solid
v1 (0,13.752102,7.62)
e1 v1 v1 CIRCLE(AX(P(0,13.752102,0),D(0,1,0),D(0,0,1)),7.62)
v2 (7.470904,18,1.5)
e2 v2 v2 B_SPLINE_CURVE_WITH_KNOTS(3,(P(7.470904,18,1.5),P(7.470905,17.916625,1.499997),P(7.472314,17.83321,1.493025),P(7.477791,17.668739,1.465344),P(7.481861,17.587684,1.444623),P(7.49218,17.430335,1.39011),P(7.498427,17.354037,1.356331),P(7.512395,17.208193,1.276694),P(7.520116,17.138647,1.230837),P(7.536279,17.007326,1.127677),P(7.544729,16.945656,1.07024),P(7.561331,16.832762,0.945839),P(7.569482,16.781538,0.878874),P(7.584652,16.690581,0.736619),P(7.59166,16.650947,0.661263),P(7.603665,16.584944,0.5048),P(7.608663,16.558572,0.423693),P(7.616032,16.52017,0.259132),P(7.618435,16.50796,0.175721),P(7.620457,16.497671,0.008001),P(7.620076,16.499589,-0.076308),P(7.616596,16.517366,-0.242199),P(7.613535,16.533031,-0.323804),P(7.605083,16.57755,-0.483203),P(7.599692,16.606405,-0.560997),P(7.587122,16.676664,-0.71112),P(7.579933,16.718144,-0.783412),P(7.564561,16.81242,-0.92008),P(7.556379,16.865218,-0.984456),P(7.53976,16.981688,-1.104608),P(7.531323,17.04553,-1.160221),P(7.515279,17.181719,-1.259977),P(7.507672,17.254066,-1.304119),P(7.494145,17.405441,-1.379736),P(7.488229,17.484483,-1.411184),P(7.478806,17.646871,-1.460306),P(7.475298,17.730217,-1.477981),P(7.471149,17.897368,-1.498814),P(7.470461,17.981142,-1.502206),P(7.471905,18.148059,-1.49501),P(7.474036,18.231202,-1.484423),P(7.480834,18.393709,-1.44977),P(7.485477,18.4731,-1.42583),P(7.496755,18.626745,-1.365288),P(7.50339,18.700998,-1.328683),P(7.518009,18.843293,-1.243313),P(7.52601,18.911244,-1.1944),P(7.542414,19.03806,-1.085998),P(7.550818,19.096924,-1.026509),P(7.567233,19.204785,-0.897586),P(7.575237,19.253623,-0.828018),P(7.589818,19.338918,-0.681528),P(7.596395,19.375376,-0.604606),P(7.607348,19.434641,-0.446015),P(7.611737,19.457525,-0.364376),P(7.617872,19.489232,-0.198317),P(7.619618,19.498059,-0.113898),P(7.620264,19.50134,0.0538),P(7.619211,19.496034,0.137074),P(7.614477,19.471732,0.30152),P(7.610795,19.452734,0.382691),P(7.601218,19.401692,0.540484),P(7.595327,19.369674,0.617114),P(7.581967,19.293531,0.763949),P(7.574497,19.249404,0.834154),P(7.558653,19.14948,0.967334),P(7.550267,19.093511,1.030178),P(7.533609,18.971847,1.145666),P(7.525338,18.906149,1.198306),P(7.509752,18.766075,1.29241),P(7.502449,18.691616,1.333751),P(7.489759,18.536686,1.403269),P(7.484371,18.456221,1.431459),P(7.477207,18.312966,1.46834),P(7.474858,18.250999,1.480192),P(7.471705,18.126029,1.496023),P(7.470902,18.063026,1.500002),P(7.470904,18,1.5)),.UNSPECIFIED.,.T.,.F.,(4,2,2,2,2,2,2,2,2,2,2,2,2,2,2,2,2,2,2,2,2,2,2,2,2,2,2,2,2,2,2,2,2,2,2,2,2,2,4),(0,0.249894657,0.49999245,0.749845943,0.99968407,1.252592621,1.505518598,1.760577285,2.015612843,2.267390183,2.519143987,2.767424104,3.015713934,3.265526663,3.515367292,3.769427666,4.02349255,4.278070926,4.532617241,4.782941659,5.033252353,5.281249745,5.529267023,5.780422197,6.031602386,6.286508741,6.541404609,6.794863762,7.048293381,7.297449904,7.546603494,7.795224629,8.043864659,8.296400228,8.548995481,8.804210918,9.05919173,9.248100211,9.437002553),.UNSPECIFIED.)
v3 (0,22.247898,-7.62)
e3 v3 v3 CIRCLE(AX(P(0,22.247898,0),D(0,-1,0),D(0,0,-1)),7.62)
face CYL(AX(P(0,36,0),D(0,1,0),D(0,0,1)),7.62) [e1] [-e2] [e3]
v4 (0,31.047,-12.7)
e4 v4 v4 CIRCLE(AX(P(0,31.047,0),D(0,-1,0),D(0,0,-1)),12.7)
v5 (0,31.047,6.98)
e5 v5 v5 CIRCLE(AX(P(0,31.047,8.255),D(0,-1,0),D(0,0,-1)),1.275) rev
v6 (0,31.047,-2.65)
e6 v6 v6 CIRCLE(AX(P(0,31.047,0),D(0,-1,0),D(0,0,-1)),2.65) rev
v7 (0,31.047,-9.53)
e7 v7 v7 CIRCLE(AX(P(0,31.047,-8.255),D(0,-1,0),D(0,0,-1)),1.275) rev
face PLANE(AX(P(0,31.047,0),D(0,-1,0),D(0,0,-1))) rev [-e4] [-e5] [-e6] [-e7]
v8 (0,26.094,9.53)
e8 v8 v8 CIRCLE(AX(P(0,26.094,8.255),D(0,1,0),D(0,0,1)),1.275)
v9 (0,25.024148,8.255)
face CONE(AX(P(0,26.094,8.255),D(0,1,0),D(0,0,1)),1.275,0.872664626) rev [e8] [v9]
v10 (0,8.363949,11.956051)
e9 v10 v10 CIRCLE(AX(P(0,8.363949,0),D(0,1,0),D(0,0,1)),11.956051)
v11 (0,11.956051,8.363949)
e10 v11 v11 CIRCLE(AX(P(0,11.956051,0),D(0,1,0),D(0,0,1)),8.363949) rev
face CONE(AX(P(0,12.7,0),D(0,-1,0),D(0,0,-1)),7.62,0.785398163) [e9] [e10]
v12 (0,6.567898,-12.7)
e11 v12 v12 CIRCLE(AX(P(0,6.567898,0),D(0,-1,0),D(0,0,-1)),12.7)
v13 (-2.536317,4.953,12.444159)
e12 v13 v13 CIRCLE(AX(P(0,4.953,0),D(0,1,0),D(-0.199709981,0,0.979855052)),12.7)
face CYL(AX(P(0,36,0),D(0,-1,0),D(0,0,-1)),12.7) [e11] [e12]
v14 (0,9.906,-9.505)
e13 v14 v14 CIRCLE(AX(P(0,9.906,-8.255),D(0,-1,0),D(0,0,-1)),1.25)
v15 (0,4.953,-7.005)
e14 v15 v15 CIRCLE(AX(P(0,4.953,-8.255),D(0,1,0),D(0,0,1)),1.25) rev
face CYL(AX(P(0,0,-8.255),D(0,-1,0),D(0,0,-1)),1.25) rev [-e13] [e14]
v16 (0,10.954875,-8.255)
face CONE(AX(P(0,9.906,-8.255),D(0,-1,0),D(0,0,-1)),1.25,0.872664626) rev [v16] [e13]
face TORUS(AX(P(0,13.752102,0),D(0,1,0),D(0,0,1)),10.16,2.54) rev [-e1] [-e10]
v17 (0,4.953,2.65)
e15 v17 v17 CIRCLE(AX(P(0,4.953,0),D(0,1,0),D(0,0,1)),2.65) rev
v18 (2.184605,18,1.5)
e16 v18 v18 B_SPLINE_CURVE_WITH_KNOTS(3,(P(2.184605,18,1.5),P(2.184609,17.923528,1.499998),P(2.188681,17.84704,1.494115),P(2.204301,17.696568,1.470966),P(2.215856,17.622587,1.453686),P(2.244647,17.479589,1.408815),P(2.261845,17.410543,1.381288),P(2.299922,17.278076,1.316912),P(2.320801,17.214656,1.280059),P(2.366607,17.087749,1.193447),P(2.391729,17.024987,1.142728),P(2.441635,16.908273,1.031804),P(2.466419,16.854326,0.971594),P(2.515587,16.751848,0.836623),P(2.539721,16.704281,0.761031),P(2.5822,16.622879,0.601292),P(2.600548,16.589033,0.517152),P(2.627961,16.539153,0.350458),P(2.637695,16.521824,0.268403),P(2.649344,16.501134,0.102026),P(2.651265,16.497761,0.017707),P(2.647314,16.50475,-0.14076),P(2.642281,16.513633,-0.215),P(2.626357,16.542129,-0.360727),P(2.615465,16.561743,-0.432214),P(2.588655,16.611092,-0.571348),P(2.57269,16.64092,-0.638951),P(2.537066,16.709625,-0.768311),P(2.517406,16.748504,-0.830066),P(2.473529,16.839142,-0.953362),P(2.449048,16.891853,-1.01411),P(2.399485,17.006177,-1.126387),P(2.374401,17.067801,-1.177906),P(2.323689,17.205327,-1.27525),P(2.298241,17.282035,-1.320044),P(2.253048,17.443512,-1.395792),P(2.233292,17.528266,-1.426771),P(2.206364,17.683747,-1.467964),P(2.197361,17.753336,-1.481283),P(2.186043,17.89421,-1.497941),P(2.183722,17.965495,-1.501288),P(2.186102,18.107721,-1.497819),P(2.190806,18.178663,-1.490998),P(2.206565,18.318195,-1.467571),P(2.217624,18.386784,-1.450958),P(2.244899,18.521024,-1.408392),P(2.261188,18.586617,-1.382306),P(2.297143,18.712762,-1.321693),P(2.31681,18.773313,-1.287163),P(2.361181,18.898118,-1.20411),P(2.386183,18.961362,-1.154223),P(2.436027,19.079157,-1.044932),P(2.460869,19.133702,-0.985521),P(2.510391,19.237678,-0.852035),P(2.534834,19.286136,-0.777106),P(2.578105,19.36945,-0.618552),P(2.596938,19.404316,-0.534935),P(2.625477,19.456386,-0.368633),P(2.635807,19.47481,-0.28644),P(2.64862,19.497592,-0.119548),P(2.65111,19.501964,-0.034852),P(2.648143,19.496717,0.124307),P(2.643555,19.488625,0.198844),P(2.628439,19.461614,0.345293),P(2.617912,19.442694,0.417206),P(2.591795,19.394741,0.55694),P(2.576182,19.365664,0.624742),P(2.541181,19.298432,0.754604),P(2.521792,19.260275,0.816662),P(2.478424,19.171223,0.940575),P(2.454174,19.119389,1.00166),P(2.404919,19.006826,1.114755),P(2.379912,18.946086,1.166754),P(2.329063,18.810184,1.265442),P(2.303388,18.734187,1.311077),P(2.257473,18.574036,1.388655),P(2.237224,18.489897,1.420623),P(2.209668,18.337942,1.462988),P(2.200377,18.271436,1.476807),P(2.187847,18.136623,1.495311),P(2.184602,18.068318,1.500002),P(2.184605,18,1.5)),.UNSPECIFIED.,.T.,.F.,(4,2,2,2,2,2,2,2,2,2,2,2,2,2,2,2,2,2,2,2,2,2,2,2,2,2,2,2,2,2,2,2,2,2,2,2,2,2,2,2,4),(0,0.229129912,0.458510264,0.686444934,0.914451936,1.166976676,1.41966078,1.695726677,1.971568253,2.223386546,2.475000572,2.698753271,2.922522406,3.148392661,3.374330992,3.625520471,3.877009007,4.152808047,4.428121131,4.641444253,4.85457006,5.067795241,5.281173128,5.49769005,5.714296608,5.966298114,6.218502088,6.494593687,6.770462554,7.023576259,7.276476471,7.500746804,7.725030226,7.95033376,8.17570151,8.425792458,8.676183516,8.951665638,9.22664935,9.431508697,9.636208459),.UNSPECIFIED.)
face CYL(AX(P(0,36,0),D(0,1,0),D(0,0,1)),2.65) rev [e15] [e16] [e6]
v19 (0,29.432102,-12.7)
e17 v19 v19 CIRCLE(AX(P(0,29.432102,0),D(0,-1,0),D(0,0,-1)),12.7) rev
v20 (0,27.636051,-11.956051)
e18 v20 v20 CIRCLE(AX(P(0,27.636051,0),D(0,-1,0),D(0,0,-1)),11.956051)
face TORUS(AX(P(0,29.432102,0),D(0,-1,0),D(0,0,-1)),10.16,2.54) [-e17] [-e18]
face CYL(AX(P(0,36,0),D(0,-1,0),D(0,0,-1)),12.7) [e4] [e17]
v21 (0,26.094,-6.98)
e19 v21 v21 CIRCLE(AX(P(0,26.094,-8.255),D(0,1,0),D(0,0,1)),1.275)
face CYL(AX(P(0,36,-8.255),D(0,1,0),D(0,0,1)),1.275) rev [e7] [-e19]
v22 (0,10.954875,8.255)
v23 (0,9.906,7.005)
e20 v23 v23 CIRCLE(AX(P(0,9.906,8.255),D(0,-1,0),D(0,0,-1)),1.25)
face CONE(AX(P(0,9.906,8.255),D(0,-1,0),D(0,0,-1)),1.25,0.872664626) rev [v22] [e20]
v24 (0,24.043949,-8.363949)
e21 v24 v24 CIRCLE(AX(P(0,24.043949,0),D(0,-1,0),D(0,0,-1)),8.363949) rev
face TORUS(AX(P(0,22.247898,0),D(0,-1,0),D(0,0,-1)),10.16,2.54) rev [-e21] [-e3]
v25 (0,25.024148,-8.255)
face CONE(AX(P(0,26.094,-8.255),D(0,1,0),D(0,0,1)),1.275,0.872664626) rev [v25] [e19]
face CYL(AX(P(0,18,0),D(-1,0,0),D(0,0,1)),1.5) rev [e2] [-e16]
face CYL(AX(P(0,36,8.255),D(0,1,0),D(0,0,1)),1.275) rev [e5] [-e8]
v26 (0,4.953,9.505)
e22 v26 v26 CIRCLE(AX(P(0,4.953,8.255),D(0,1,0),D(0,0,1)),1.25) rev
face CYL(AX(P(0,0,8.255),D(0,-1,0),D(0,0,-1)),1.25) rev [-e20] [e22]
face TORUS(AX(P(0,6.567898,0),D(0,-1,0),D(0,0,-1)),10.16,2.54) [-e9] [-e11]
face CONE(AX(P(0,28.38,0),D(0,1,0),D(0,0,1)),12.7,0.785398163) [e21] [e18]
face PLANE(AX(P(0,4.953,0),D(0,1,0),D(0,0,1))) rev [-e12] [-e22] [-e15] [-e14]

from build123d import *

# Parameters (mm, degrees)
SKETCH1_R                 = 12.7
BOSS_EXTRUDE1_DEPTH       = 36
F_5_0MM_DOWEL_HOLE1_D     = 5.3
BOSS_EXTRUDE2_START       = -4.953
BOSS_EXTRUDE2_DEPTH       = 2.286
CIRPATTERN3_COUNT         = 33
CIRPATTERN3_ANGLE         = 348.48
CIRPATTERN3_START         = -4.953
CIRPATTERN3_COPY_1_DEPTH  = 2.286
CIRPATTERN3_COPY_2_DEPTH  = 2.286
CIRPATTERN3_COPY_3_DEPTH  = 2.286
CIRPATTERN3_COPY_4_DEPTH  = 2.286
CIRPATTERN3_COPY_5_DEPTH  = 2.286
CIRPATTERN3_COPY_6_DEPTH  = 2.286
CIRPATTERN3_COPY_7_DEPTH  = 2.286
CIRPATTERN3_COPY_8_DEPTH  = 2.286
CIRPATTERN3_COPY_9_DEPTH  = 2.286
CIRPATTERN3_COPY_10_DEPTH = 2.286
CIRPATTERN3_COPY_11_DEPTH = 2.286
CIRPATTERN3_COPY_12_DEPTH = 2.286
CIRPATTERN3_COPY_13_DEPTH = 2.286
CIRPATTERN3_COPY_14_DEPTH = 2.286
CIRPATTERN3_COPY_15_DEPTH = 2.286
CIRPATTERN3_COPY_16_DEPTH = 2.286
CIRPATTERN3_COPY_17_DEPTH = 2.286
CIRPATTERN3_COPY_18_DEPTH = 2.286
CIRPATTERN3_COPY_19_DEPTH = 2.286
CIRPATTERN3_COPY_20_DEPTH = 2.286
CIRPATTERN3_COPY_21_DEPTH = 2.286
CIRPATTERN3_COPY_22_DEPTH = 2.286
CIRPATTERN3_COPY_23_DEPTH = 2.286
CIRPATTERN3_COPY_24_DEPTH = 2.286
CIRPATTERN3_COPY_25_DEPTH = 2.286
CIRPATTERN3_COPY_26_DEPTH = 2.286
CIRPATTERN3_COPY_27_DEPTH = 2.286
CIRPATTERN3_COPY_28_DEPTH = 2.286
CIRPATTERN3_COPY_29_DEPTH = 2.286
CIRPATTERN3_COPY_30_DEPTH = 2.286
CIRPATTERN3_COPY_31_DEPTH = 2.286
CIRPATTERN3_COPY_32_DEPTH = 2.286
SKETCH7_W                 = 5.08
SKETCH7_H                 = 20.76
CHAMFER1_SIZE             = 5.08
SKETCH10_W                = 1.5
SKETCH10_H                = 14.726283714
FILLET2_R                 = 1.27
M3X0_5_TAPPED_HOLE2_D     = 2.55
M3X0_5_TAPPED_HOLE2_DEPTH = 9.906
M3X0_5_TAPPED_HOLE2_TIP   = 1.06985203
M3X0_5_TAPPED_HOLE1_D     = 2.5
M3X0_5_TAPPED_HOLE1_DEPTH = 9.906
M3X0_5_TAPPED_HOLE1_TIP   = 1.048874539
INTERSECT1_OUTLINE_R      = 2.65
INTERSECT1_OUTLINE_R_2    = 1.25
INTERSECT1_DEPTH          = 4.953
INTERSECT1_START          = 31.047
INTERSECT1_2_OUTLINE_R    = 1.275
INTERSECT1_2_OUTLINE_R_2  = 2.65
INTERSECT1_2_DEPTH        = 4.953


with BuildPart() as part:
    # Sketch1 → Boss-Extrude1 (new body)
    with BuildSketch(Plane(origin=(0, 0, 0), x_dir=(1, 0, 0), z_dir=(0, 1, 0))):
        with Locations(Location((0, 0, 0), (0, 0, 270))):
            Circle(SKETCH1_R)
    extrude(amount=BOSS_EXTRUDE1_DEPTH)

    # Ø5.0mm Dowel Hole1 (through all)
    with Locations(Plane(origin=(0, 36, 0), x_dir=(1, 0, 0), z_dir=(0, 1, 0))):
        with Locations((0, 0)):
            Hole(F_5_0MM_DOWEL_HOLE1_D / 2)

    # Sketch4 → Boss-Extrude2 (add)
    with BuildSketch(Plane(origin=(0, 36, 0), x_dir=(1, 0, 0), z_dir=(0, 1, 0)).offset(BOSS_EXTRUDE2_START)):
        with BuildLine():
            Line((14.726283714, 0.381), (12.694283714, 0.381))
            ThreePointArc((12.694283714, 0.381), (12.698570848, 0.19052144), (12.7, 0))
            ThreePointArc((12.7, 0), (12.698570848, -0.19052144), (12.694283714, -0.381))
            Line((12.694283714, -0.381), (14.726283714, -0.381))
            Line((14.726283714, -0.381), (14.726283714, 0.381))
        make_face()
    boss_extrude2 = extrude(amount=BOSS_EXTRUDE2_DEPTH)

    # Mirror4: Boss-Extrude2 across plane
    add(boss_extrude2.mirror(Plane.ZX.offset(18)))

    # CirPattern3: Boss-Extrude2 ×33 about axis
    cirpattern3_axis = Axis((0, 0, 0), (0, 1, 0))
    for i in range(1, CIRPATTERN3_COUNT):
        add(boss_extrude2.rotate(cirpattern3_axis, i * CIRPATTERN3_ANGLE / (CIRPATTERN3_COUNT - 1)))

    # CirPattern3 copy 1 sketch → CirPattern3 copy 1 (add)
    with BuildSketch(Plane(origin=(0, 0, 0), x_dir=(0.9819917011209965, 0, -0.18892405598412157), z_dir=(0, -1, 0)).offset(CIRPATTERN3_START)):
        with BuildLine():
            Line((14.726283714, -0.381), (12.694283714, -0.381))
            ThreePointArc((12.694283714, -0.381), (12.698570848, -0.19052144), (12.7, 0))
            ThreePointArc((12.7, 0), (12.698570848, 0.19052144), (12.694283714, 0.381))
            Line((12.694283714, 0.381), (14.726283714, 0.381))
            Line((14.726283714, 0.381), (14.726283714, -0.381))
        make_face()
    extrude(amount=CIRPATTERN3_COPY_1_DEPTH)

    # CirPattern3 copy 2 sketch → CirPattern3 copy 2 (add)
    with BuildSketch(Plane(origin=(0, 0, 0), x_dir=(0.928615402141017, 0, -0.37104371023705185), z_dir=(0, -1, 0)).offset(CIRPATTERN3_START)):
        with BuildLine():
            Line((14.726283714, -0.381), (12.694283714, -0.381))
            ThreePointArc((12.694283714, -0.381), (12.698570848, -0.19052144), (12.7, 0))
            ThreePointArc((12.7, 0), (12.698570848, 0.19052144), (12.694283714, 0.381))
            Line((12.694283714, 0.381), (14.726283714, 0.381))
            Line((14.726283714, 0.381), (14.726283714, -0.381))
        make_face()
    extrude(amount=CIRPATTERN3_COPY_2_DEPTH)

    # CirPattern3 copy 3 sketch → CirPattern3 copy 3 (add)
    with BuildSketch(Plane(origin=(0, 0, 0), x_dir=(0.8417935357502346, 0, -0.5397996324277357), z_dir=(0, -1, 0)).offset(CIRPATTERN3_START)):
        with BuildLine():
            Line((14.726283714, -0.381), (12.694283714, -0.381))
            ThreePointArc((12.694283714, -0.381), (12.698570848, -0.19052144), (12.7, 0))
            ThreePointArc((12.7, 0), (12.698570848, 0.19052144), (12.694283714, 0.381))
            Line((12.694283714, 0.381), (14.726283714, 0.381))
            Line((14.726283714, 0.381), (14.726283714, -0.381))
        make_face()
    extrude(amount=CIRPATTERN3_COPY_3_DEPTH)

    # CirPattern3 copy 4 sketch → CirPattern3 copy 4 (add)
    with BuildSketch(Plane(origin=(0, 0, 0), x_dir=(0.7246531301870455, 0, -0.6891138083873497), z_dir=(0, -1, 0)).offset(CIRPATTERN3_START)):
        with BuildLine():
            Line((14.726283714, -0.381), (12.694283714, -0.381))
            ThreePointArc((12.694283714, -0.381), (12.698570848, -0.19052144), (12.7, 0))
            ThreePointArc((12.7, 0), (12.698570848, 0.19052144), (12.694283714, 0.381))
            Line((12.694283714, 0.381), (14.726283714, 0.381))
            Line((14.726283714, 0.381), (14.726283714, -0.381))
        make_face()
    extrude(amount=CIRPATTERN3_COPY_4_DEPTH)

    # CirPattern3 copy 5 sketch → CirPattern3 copy 5 (add)
    with BuildSketch(Plane(origin=(0, 0, 0), x_dir=(0.5814131843198288, 0, -0.8136084495007884), z_dir=(0, -1, 0)).offset(CIRPATTERN3_START)):
        with BuildLine():
            Line((14.726283714, -0.381), (12.694283714, -0.381))
            ThreePointArc((12.694283714, -0.381), (12.698570848, -0.19052144), (12.7, 0))
            ThreePointArc((12.7, 0), (12.698570848, 0.19052144), (12.694283714, 0.381))
            Line((12.694283714, 0.381), (14.726283714, 0.381))
            Line((14.726283714, 0.381), (14.726283714, -0.381))
        make_face()
    extrude(amount=CIRPATTERN3_COPY_5_DEPTH)

    # CirPattern3 copy 6 sketch → CirPattern3 copy 6 (add)
    with BuildSketch(Plane(origin=(0, 0, 0), x_dir=(0.417232713661763, 0, -0.9087996823560411), z_dir=(0, -1, 0)).offset(CIRPATTERN3_START)):
        with BuildLine():
            Line((14.726283714, -0.381), (12.694283714, -0.381))
            ThreePointArc((12.694283714, -0.381), (12.698570848, -0.19052144), (12.7, 0))
            ThreePointArc((12.7, 0), (12.698570848, 0.19052144), (12.694283714, 0.381))
            Line((12.694283714, 0.381), (14.726283714, 0.381))
            Line((14.726283714, 0.381), (14.726283714, -0.381))
        make_face()
    extrude(amount=CIRPATTERN3_COPY_6_DEPTH)

    # CirPattern3 copy 7 sketch → CirPattern3 copy 7 (add)
    with BuildSketch(Plane(origin=(0, 0, 0), x_dir=(0.2380249401842595, 0, -0.971259042609272), z_dir=(0, -1, 0)).offset(CIRPATTERN3_START)):
        with BuildLine():
            Line((14.726283714, -0.381), (12.694283714, -0.381))
            ThreePointArc((12.694283714, -0.381), (12.698570848, -0.19052144), (12.7, 0))
            ThreePointArc((12.7, 0), (12.698570848, 0.19052144), (12.694283714, 0.381))
            Line((12.694283714, 0.381), (14.726283714, 0.381))
            Line((14.726283714, 0.381), (14.726283714, -0.381))
        make_face()
    extrude(amount=CIRPATTERN3_COPY_7_DEPTH)

    # CirPattern3 copy 8 sketch → CirPattern3 copy 8 (add)
    with BuildSketch(Plane(origin=(0, 0, 0), x_dir=(0.05024431817976605, 0, -0.9987369566060177), z_dir=(0, -1, 0)).offset(CIRPATTERN3_START)):
        with BuildLine():
            Line((14.726283714, -0.381), (12.694283714, -0.381))
            ThreePointArc((12.694283714, -0.381), (12.698570848, -0.19052144), (12.7, 0))
            ThreePointArc((12.7, 0), (12.698570848, 0.19052144), (12.694283714, 0.381))
            Line((12.694283714, 0.381), (14.726283714, 0.381))
            Line((14.726283714, 0.381), (14.726283714, -0.381))
        make_face()
    extrude(amount=CIRPATTERN3_COPY_8_DEPTH)

    # CirPattern3 copy 9 sketch → CirPattern3 copy 9 (add)
    with BuildSketch(Plane(origin=(0, 0, 0), x_dir=(-0.13934593322223357, 0, -0.9902437633706282), z_dir=(0, -1, 0)).offset(CIRPATTERN3_START)):
        with BuildLine():
            Line((14.726283714, -0.381), (12.694283714, -0.381))
            ThreePointArc((12.694283714, -0.381), (12.698570848, -0.19052144), (12.7, 0))
            ThreePointArc((12.7, 0), (12.698570848, 0.19052144), (12.694283714, 0.381))
            Line((12.694283714, 0.381), (14.726283714, 0.381))
            Line((14.726283714, 0.381), (14.726283714, -0.381))
        make_face()
    extrude(amount=CIRPATTERN3_COPY_9_DEPTH)

    # CirPattern3 copy 10 sketch → CirPattern3 copy 10 (add)
    with BuildSketch(Plane(origin=(0, 0, 0), x_dir=(-0.3239174181981537, 0, -0.9460853588275439), z_dir=(0, -1, 0)).offset(CIRPATTERN3_START)):
        with BuildLine():
            Line((14.726283714, -0.381), (12.694283714, -0.381))
            ThreePointArc((12.694283714, -0.381), (12.698570848, -0.19052144), (12.7, 0))
            ThreePointArc((12.7, 0), (12.698570848, 0.19052144), (12.694283714, 0.381))
            Line((12.694283714, 0.381), (14.726283714, 0.381))
            Line((14.726283714, 0.381), (14.726283714, -0.381))
        make_face()
    extrude(amount=CIRPATTERN3_COPY_10_DEPTH)

    # CirPattern3 copy 11 sketch → CirPattern3 copy 11 (add)
    with BuildSketch(Plane(origin=(0, 0, 0), x_dir=(-0.4968224998160187, 0, -0.8678521784708281), z_dir=(0, -1, 0)).offset(CIRPATTERN3_START)):
        with BuildLine():
            Line((14.726283714, -0.381), (12.694283714, -0.381))
            ThreePointArc((12.694283714, -0.381), (12.698570848, -0.19052144), (12.7, 0))
            ThreePointArc((12.7, 0), (12.698570848, 0.19052144), (12.694283714, 0.381))
            Line((12.694283714, 0.381), (14.726283714, 0.381))
            Line((14.726283714, 0.381), (14.726283714, -0.381))
        make_face()
    extrude(amount=CIRPATTERN3_COPY_11_DEPTH)

    # CirPattern3 copy 12 sketch → CirPattern3 copy 12 (add)
    with BuildSketch(Plane(origin=(0, 0, 0), x_dir=(-0.6518337253008826, 0, -0.7583619152887185), z_dir=(0, -1, 0)).offset(CIRPATTERN3_START)):
        with BuildLine():
            Line((14.726283714, -0.381), (12.694283714, -0.381))
            ThreePointArc((12.694283714, -0.381), (12.698570848, -0.19052144), (12.7, 0))
            ThreePointArc((12.7, 0), (12.698570848, 0.19052144), (12.694283714, 0.381))
            Line((12.694283714, 0.381), (14.726283714, 0.381))
            Line((14.726283714, 0.381), (14.726283714, -0.381))
        make_face()
    extrude(amount=CIRPATTERN3_COPY_12_DEPTH)

    # CirPattern3 copy 13 sketch → CirPattern3 copy 13 (add)
    with BuildSketch(Plane(origin=(0, 0, 0), x_dir=(-0.7833681176964816, 0, -0.6215580360486632), z_dir=(0, -1, 0)).offset(CIRPATTERN3_START)):
        with BuildLine():
            Line((14.726283714, -0.381), (12.694283714, -0.381))
            ThreePointArc((12.694283714, -0.381), (12.698570848, -0.19052144), (12.7, 0))
            ThreePointArc((12.7, 0), (12.698570848, 0.19052144), (12.694283714, 0.381))
            Line((12.694283714, 0.381), (14.726283714, 0.381))
            Line((14.726283714, 0.381), (14.726283714, -0.381))
        make_face()
    extrude(amount=CIRPATTERN3_COPY_13_DEPTH)

    # CirPattern3 copy 14 sketch → CirPattern3 copy 14 (add)
    with BuildSketch(Plane(origin=(0, 0, 0), x_dir=(-0.8866882557005594, 0, -0.46236775104098626), z_dir=(0, -1, 0)).offset(CIRPATTERN3_START)):
        with BuildLine():
            Line((14.726283714, -0.381), (12.694283714, -0.381))
            ThreePointArc((12.694283714, -0.381), (12.698570848, -0.19052144), (12.7, 0))
            ThreePointArc((12.7, 0), (12.698570848, 0.19052144), (12.694283714, 0.381))
            Line((12.694283714, 0.381), (14.726283714, 0.381))
            Line((14.726283714, 0.381), (14.726283714, -0.381))
        make_face()
    extrude(amount=CIRPATTERN3_COPY_14_DEPTH)

    # CirPattern3 copy 15 sketch → CirPattern3 copy 15 (add)
    with BuildSketch(Plane(origin=(0, 0, 0), x_dir=(-0.9580728994623211, 0, -0.2865245527277917), z_dir=(0, -1, 0)).offset(CIRPATTERN3_START)):
        with BuildLine():
            Line((14.726283714, -0.381), (12.694283714, -0.381))
            ThreePointArc((12.694283714, -0.381), (12.698570848, -0.19052144), (12.7, 0))
            ThreePointArc((12.7, 0), (12.698570848, 0.19052144), (12.694283714, 0.381))
            Line((12.694283714, 0.381), (14.726283714, 0.381))
            Line((14.726283714, 0.381), (14.726283714, -0.381))
        make_face()
    extrude(amount=CIRPATTERN3_COPY_15_DEPTH)

    # CirPattern3 copy 16 sketch → CirPattern3 copy 16 (add)
    with BuildSketch(Plane(origin=(0, 0, 0), x_dir=(-0.9949510169813008, 0, -0.1003617148512079), z_dir=(0, -1, 0)).offset(CIRPATTERN3_START)):
        with BuildLine():
            Line((14.726283714, -0.381), (12.694283714, -0.381))
            ThreePointArc((12.694283714, -0.381), (12.698570848, -0.19052144), (12.7, 0))
            ThreePointArc((12.7, 0), (12.698570848, 0.19052144), (12.694283714, 0.381))
            Line((12.694283714, 0.381), (14.726283714, 0.381))
            Line((14.726283714, 0.381), (14.726283714, -0.381))
        make_face()
    extrude(amount=CIRPATTERN3_COPY_16_DEPTH)

    # CirPattern3 copy 17 sketch → CirPattern3 copy 17 (add)
    with BuildSketch(Plane(origin=(0, 0, 0), x_dir=(-0.9959943839327452, 0, 0.08941581053947567), z_dir=(0, -1, 0)).offset(CIRPATTERN3_START)):
        with BuildLine():
            Line((14.726283714, -0.381), (12.694283714, -0.381))
            ThreePointArc((12.694283714, -0.381), (12.698570848, -0.19052144), (12.7, 0))
            ThreePointArc((12.7, 0), (12.698570848, 0.19052144), (12.694283714, 0.381))
            Line((12.694283714, 0.381), (14.726283714, 0.381))
            Line((14.726283714, 0.381), (14.726283714, -0.381))
        make_face()
    extrude(amount=CIRPATTERN3_COPY_17_DEPTH)

    # CirPattern3 copy 18 sketch → CirPattern3 copy 18 (add)
    with BuildSketch(Plane(origin=(0, 0, 0), x_dir=(-0.9611654217888497, 0, 0.27597288264875364), z_dir=(0, -1, 0)).offset(CIRPATTERN3_START)):
        with BuildLine():
            Line((14.726283714, -0.381), (12.694283714, -0.381))
            ThreePointArc((12.694283714, -0.381), (12.698570848, -0.19052144), (12.7, 0))
            ThreePointArc((12.7, 0), (12.698570848, 0.19052144), (12.694283714, 0.381))
            Line((12.694283714, 0.381), (14.726283714, 0.381))
            Line((14.726283714, 0.381), (14.726283714, -0.381))
        make_face()
    extrude(amount=CIRPATTERN3_COPY_18_DEPTH)

    # CirPattern3 copy 19 sketch → CirPattern3 copy 19 (add)
    with BuildSketch(Plane(origin=(0, 0, 0), x_dir=(-0.8917185512694802, 0, 0.45259035045155294), z_dir=(0, -1, 0)).offset(CIRPATTERN3_START)):
        with BuildLine():
            Line((14.726283714, -0.381), (12.694283714, -0.381))
            ThreePointArc((12.694283714, -0.381), (12.698570848, -0.19052144), (12.7, 0))
            ThreePointArc((12.7, 0), (12.698570848, 0.19052144), (12.694283714, 0.381))
            Line((12.694283714, 0.381), (14.726283714, 0.381))
            Line((14.726283714, 0.381), (14.726283714, -0.381))
        make_face()
    extrude(amount=CIRPATTERN3_COPY_19_DEPTH)

    # CirPattern3 copy 20 sketch → CirPattern3 copy 20 (add)
    with BuildSketch(Plane(origin=(0, 0, 0), x_dir=(-0.7901550123756849, 0, 0.6129070536529836), z_dir=(0, -1, 0)).offset(CIRPATTERN3_START)):
        with BuildLine():
            Line((14.726283714, -0.381), (12.694283714, -0.381))
            ThreePointArc((12.694283714, -0.381), (12.698570848, -0.19052144), (12.7, 0))
            ThreePointArc((12.7, 0), (12.698570848, 0.19052144), (12.694283714, 0.381))
            Line((12.694283714, 0.381), (14.726283714, 0.381))
            Line((14.726283714, 0.381), (14.726283714, -0.381))
        make_face()
    extrude(amount=CIRPATTERN3_COPY_20_DEPTH)

    # CirPattern3 copy 21 sketch → CirPattern3 copy 21 (add)
    with BuildSketch(Plane(origin=(0, 0, 0), x_dir=(-0.6601327782346817, 0, 0.7511489300399492), z_dir=(0, -1, 0)).offset(CIRPATTERN3_START)):
        with BuildLine():
            Line((14.726283714, -0.381), (12.694283714, -0.381))
            ThreePointArc((12.694283714, -0.381), (12.698570848, -0.19052144), (12.7, 0))
            ThreePointArc((12.7, 0), (12.698570848, 0.19052144), (12.694283714, 0.381))
            Line((12.694283714, 0.381), (14.726283714, 0.381))
            Line((14.726283714, 0.381), (14.726283714, -0.381))
        make_face()
    extrude(amount=CIRPATTERN3_COPY_21_DEPTH)

    # CirPattern3 copy 22 sketch → CirPattern3 copy 22 (add)
    with BuildSketch(Plane(origin=(0, 0, 0), x_dir=(-0.5063348073531241, 0, 0.8623369775573089), z_dir=(0, -1, 0)).offset(CIRPATTERN3_START)):
        with BuildLine():
            Line((14.726283714, -0.381), (12.694283714, -0.381))
            ThreePointArc((12.694283714, -0.381), (12.698570848, -0.19052144), (12.7, 0))
            ThreePointArc((12.7, 0), (12.698570848, 0.19052144), (12.694283714, 0.381))
            Line((12.694283714, 0.381), (14.726283714, 0.381))
            Line((14.726283714, 0.381), (14.726283714, -0.381))
        make_face()
    extrude(amount=CIRPATTERN3_COPY_22_DEPTH)

    # CirPattern3 copy 23 sketch → CirPattern3 copy 23 (add)
    with BuildSketch(Plane(origin=(0, 0, 0), x_dir=(-0.334300379384251, 0, 0.9424665810221314), z_dir=(0, -1, 0)).offset(CIRPATTERN3_START)):
        with BuildLine():
            Line((14.726283714, -0.381), (12.694283714, -0.381))
            ThreePointArc((12.694283714, -0.381), (12.698570848, -0.19052144), (12.7, 0))
            ThreePointArc((12.7, 0), (12.698570848, 0.19052144), (12.694283714, 0.381))
            Line((12.694283714, 0.381), (14.726283714, 0.381))
            Line((14.726283714, 0.381), (14.726283714, -0.381))
        make_face()
    extrude(amount=CIRPATTERN3_COPY_23_DEPTH)

    # CirPattern3 copy 24 sketch → CirPattern3 copy 24 (add)
    with BuildSketch(Plane(origin=(0, 0, 0), x_dir=(-0.15022558912074707, 0, 0.9886517447379155), z_dir=(0, -1, 0)).offset(CIRPATTERN3_START)):
        with BuildLine():
            Line((14.726283714, -0.381), (12.694283714, -0.381))
            ThreePointArc((12.694283714, -0.381), (12.698570848, -0.19052144), (12.7, 0))
            ThreePointArc((12.7, 0), (12.698570848, 0.19052144), (12.694283714, 0.381))
            Line((12.694283714, 0.381), (14.726283714, 0.381))
            Line((14.726283714, 0.381), (14.726283714, -0.381))
        make_face()
    extrude(amount=CIRPATTERN3_COPY_24_DEPTH)

    # CirPattern3 copy 25 sketch → CirPattern3 copy 25 (add)
    with BuildSketch(Plane(origin=(0, 0, 0), x_dir=(0.039259815759079296, 0, 0.9992290362407226), z_dir=(0, -1, 0)).offset(CIRPATTERN3_START)):
        with BuildLine():
            Line((14.726283714, -0.381), (12.694283714, -0.381))
            ThreePointArc((12.694283714, -0.381), (12.698570848, -0.19052144), (12.7, 0))
            ThreePointArc((12.7, 0), (12.698570848, 0.19052144), (12.694283714, 0.381))
            Line((12.694283714, 0.381), (14.726283714, 0.381))
            Line((14.726283714, 0.381), (14.726283714, -0.381))
        make_face()
    extrude(amount=CIRPATTERN3_COPY_25_DEPTH)

    # CirPattern3 copy 26 sketch → CirPattern3 copy 26 (add)
    with BuildSketch(Plane(origin=(0, 0, 0), x_dir=(0.22733121564665745, 0, 0.9738174974771263), z_dir=(0, -1, 0)).offset(CIRPATTERN3_START)):
        with BuildLine():
            Line((14.726283714, -0.381), (12.694283714, -0.381))
            ThreePointArc((12.694283714, -0.381), (12.698570848, -0.19052144), (12.7, 0))
            ThreePointArc((12.7, 0), (12.698570848, 0.19052144), (12.694283714, 0.381))
            Line((12.694283714, 0.381), (14.726283714, 0.381))
            Line((14.726283714, 0.381), (14.726283714, -0.381))
        make_face()
    extrude(amount=CIRPATTERN3_COPY_26_DEPTH)

    # CirPattern3 copy 27 sketch → CirPattern3 copy 27 (add)
    with BuildSketch(Plane(origin=(0, 0, 0), x_dir=(0.4072149185824512, 0, 0.9133323656171874), z_dir=(0, -1, 0)).offset(CIRPATTERN3_START)):
        with BuildLine():
            Line((14.726283714, -0.381), (12.694283714, -0.381))
            ThreePointArc((12.694283714, -0.381), (12.698570848, -0.19052144), (12.7, 0))
            ThreePointArc((12.7, 0), (12.698570848, 0.19052144), (12.694283714, 0.381))
            Line((12.694283714, 0.381), (14.726283714, 0.381))
            Line((14.726283714, 0.381), (14.726283714, -0.381))
        make_face()
    extrude(amount=CIRPATTERN3_COPY_27_DEPTH)

    # CirPattern3 copy 28 sketch → CirPattern3 copy 28 (add)
    with BuildSketch(Plane(origin=(0, 0, 0), x_dir=(0.5724321255946011, 0, 0.8199521093254452), z_dir=(0, -1, 0)).offset(CIRPATTERN3_START)):
        with BuildLine():
            Line((14.726283714, -0.381), (12.694283714, -0.381))
            ThreePointArc((12.694283714, -0.381), (12.698570848, -0.19052144), (12.7, 0))
            ThreePointArc((12.7, 0), (12.698570848, 0.19052144), (12.694283714, 0.381))
            Line((12.694283714, 0.381), (14.726283714, 0.381))
            Line((14.726283714, 0.381), (14.726283714, -0.381))
        make_face()
    extrude(amount=CIRPATTERN3_COPY_28_DEPTH)

    # CirPattern3 copy 29 sketch → CirPattern3 copy 29 (add)
    with BuildSketch(Plane(origin=(0, 0, 0), x_dir=(0.7170322749954494, 0, 0.697039967731299), z_dir=(0, -1, 0)).offset(CIRPATTERN3_START)):
        with BuildLine():
            Line((14.726283714, -0.381), (12.694283714, -0.381))
            ThreePointArc((12.694283714, -0.381), (12.698570848, -0.19052144), (12.7, 0))
            ThreePointArc((12.7, 0), (12.698570848, 0.19052144), (12.694283714, 0.381))
            Line((12.694283714, 0.381), (14.726283714, 0.381))
            Line((14.726283714, 0.381), (14.726283714, -0.381))
        make_face()
    extrude(amount=CIRPATTERN3_COPY_29_DEPTH)

    # CirPattern3 copy 30 sketch → CirPattern3 copy 30 (add)
    with BuildSketch(Plane(origin=(0, 0, 0), x_dir=(0.8358073613682778, 0, 0.5490228179981202), z_dir=(0, -1, 0)).offset(CIRPATTERN3_START)):
        with BuildLine():
            Line((14.726283714, -0.381), (12.694283714, -0.381))
            ThreePointArc((12.694283714, -0.381), (12.698570848, -0.19052144), (12.7, 0))
            ThreePointArc((12.7, 0), (12.698570848, 0.19052144), (12.694283714, 0.381))
            Line((12.694283714, 0.381), (14.726283714, 0.381))
            Line((14.726283714, 0.381), (14.726283714, -0.381))
        make_face()
    extrude(amount=CIRPATTERN3_COPY_30_DEPTH)

    # CirPattern3 copy 31 sketch → CirPattern3 copy 31 (add)
    with BuildSketch(Plane(origin=(0, 0, 0), x_dir=(0.9244795102035234, 0, 0.3812317342691366), z_dir=(0, -1, 0)).offset(CIRPATTERN3_START)):
        with BuildLine():
            Line((14.726283714, -0.381), (12.694283714, -0.381))
            ThreePointArc((12.694283714, -0.381), (12.698570848, -0.19052144), (12.7, 0))
            ThreePointArc((12.7, 0), (12.698570848, 0.19052144), (12.694283714, 0.381))
            Line((12.694283714, 0.381), (14.726283714, 0.381))
            Line((14.726283714, 0.381), (14.726283714, -0.381))
        make_face()
    extrude(amount=CIRPATTERN3_COPY_31_DEPTH)

    # CirPattern3 copy 32 sketch → CirPattern3 copy 32 (add)
    with BuildSketch(Plane(origin=(0, 0, 0), x_dir=(0.9798550523842496, 0, 0.19970998051439326), z_dir=(0, -1, 0)).offset(CIRPATTERN3_START)):
        with BuildLine():
            Line((14.726283714, -0.381), (12.694283714, -0.381))
            ThreePointArc((12.694283714, -0.381), (12.698570848, -0.19052144), (12.7, 0))
            ThreePointArc((12.7, 0), (12.698570848, 0.19052144), (12.694283714, 0.381))
            Line((12.694283714, 0.381), (14.726283714, 0.381))
            Line((14.726283714, 0.381), (14.726283714, -0.381))
        make_face()
    extrude(amount=CIRPATTERN3_COPY_32_DEPTH)

    # Sketch7 → Cut-Revolve1 (revolve, cut)
    with BuildSketch(Plane(origin=(0, 0, 0), x_dir=(0, 0, -1), z_dir=(1, 0, 0)), mode=Mode.PRIVATE) as cut_revolve1_sk:
        with Locations((10.16, 18)):
            Rectangle(SKETCH7_W, SKETCH7_H)
    revolve(cut_revolve1_sk.sketch.rotate(Axis((0, 36, 0), (0, -1, 0)), 180), axis=Axis((0, 36, 0), (0, -1, 0)), mode=Mode.SUBTRACT)

    # Chamfer1
    chamfer1_edges = [part.edges().sort_by_distance(p)[0] for p in [
        (0, 28.38, -7.62),
        (0, 7.62, -7.62),
    ]]
    chamfer(chamfer1_edges, length=CHAMFER1_SIZE - 0.0001)  # a hair under: the kernel refuses the full size

    # Fillet1: read off the stored shape, not the designer's step
    # Fillet1 outline → Fillet1 (revolve, cut)
    with BuildSketch(Plane.XY):
        with BuildLine():
            Line((12.7, 27.636051224), (12.7, 29.432102448))
            ThreePointArc((12.7, 29.432102448), (12.506654013, 28.46008653), (11.956051224, 27.636051224))
            Line((11.956051224, 27.636051224), (12.7, 27.636051224))
        make_face()
        with BuildLine():
            Line((12.7, 8.363948776), (11.956051224, 8.363948776))
            ThreePointArc((11.956051224, 8.363948776), (12.506654013, 7.53991347), (12.7, 6.567897552))
            Line((12.7, 6.567897552), (12.7, 8.363948776))
        make_face()
    revolve(axis=Axis((0, 0, 0), (0, 1, 0)), mode=Mode.SUBTRACT)

    # Fillet1 2 outline → Fillet1 2 (revolve)
    with BuildSketch(Plane.XY):
        with BuildLine():
            ThreePointArc((7.62, 22.247897552), (7.813345987, 23.21991347), (8.363948776, 24.043948776))
            Line((8.363948776, 24.043948776), (7.62, 24.043948776))
            Line((7.62, 24.043948776), (7.62, 22.247897552))
        make_face()
        with BuildLine():
            ThreePointArc((8.363948776, 11.956051224), (7.813345987, 12.78008653), (7.62, 13.752102448))
            Line((7.62, 13.752102448), (7.62, 11.956051224))
            Line((7.62, 11.956051224), (8.363948776, 11.956051224))
        make_face()
    revolve(axis=Axis((0, 0, 0), (0, 1, 0)))

    # Sketch10 → Ø3.0mm Dowel Hole1 (revolve, cut)
    with BuildSketch(Plane.ZX.offset(18)):
        with Locations((0.75, 7.363141857)):
            Rectangle(SKETCH10_W, SKETCH10_H)
    revolve(axis=Axis((-6.35, 18, 0), (1, 0, 0)), mode=Mode.SUBTRACT)

    # Fillet2
    fillet2_edges = [part.edges().sort_by_distance(p)[0] for p in [
        (0, 0, -12.7),
        (0, 36, -12.7),
    ]]
    fillet(fillet2_edges, radius=FILLET2_R)

    # M3x0.5 Tapped Hole2
    with Locations(Plane(origin=(0, 36, 0), x_dir=(1, 0, 0), z_dir=(0, 1, 0))):
        with Locations((0, 8.255), (0, -8.255)):
            Hole(M3X0_5_TAPPED_HOLE2_D / 2, depth=M3X0_5_TAPPED_HOLE2_DEPTH)
            with Locations((0, 0, -(M3X0_5_TAPPED_HOLE2_DEPTH + M3X0_5_TAPPED_HOLE2_TIP / 2))):  # 100° drill point
                Cone(0, M3X0_5_TAPPED_HOLE2_D / 2, M3X0_5_TAPPED_HOLE2_TIP, mode=Mode.SUBTRACT)

    # M3x0.5 Tapped Hole1
    with Locations(Plane(origin=(0, 0, 0), x_dir=(-1, 0, 0), z_dir=(0, -1, 0))):
        with Locations((0, 8.255), (0, -8.255)):
            Hole(M3X0_5_TAPPED_HOLE1_D / 2, depth=M3X0_5_TAPPED_HOLE1_DEPTH)
            with Locations((0, 0, -(M3X0_5_TAPPED_HOLE1_DEPTH + M3X0_5_TAPPED_HOLE1_TIP / 2))):  # 100° drill point
                Cone(0, M3X0_5_TAPPED_HOLE1_D / 2, M3X0_5_TAPPED_HOLE1_TIP, mode=Mode.SUBTRACT)

    # Intersect1: read off the stored shape, not the designer's step
    # Intersect1 outline → Intersect1 (cut)
    with BuildSketch(Plane(origin=(0, 0, 0), x_dir=(1, 0, 0), z_dir=(0, 1, 0))):
        with BuildLine():
            ThreePointArc((12.514647536, -2.161850378), (12.635877916, -1.274593779), (12.694283714, -0.381))
            Line((12.694283714, -0.381), (14.726283714, -0.381))
            Line((14.726283714, -0.381), (14.726283714, 0.381))
            Line((14.726283714, 0.381), (12.694283714, 0.381))
            ThreePointArc((12.694283714, 0.381), (12.642694362, 1.205105499), (12.537661324, 2.024116729))
            Line((12.537661324, 2.024116729), (14.53306846, 2.408010411))
            Line((14.53306846, 2.408010411), (14.38910833, 3.156288087))
            Line((14.38910833, 3.156288087), (12.393701193, 2.772394405))
            ThreePointArc((12.393701193, 2.772394405), (12.187347525, 3.571912696), (11.929475029, 4.35633166))
            Line((11.929475029, 4.35633166), (13.816421526, 5.110292479))
            Line((13.816421526, 5.110292479), (13.533686219, 5.817897415))
            Line((13.533686219, 5.817897415), (11.646739722, 5.063936596))
            ThreePointArc((11.646739722, 5.063936596), (11.293053894, 5.810071751), (10.891629631, 6.531646345))
            Line((10.891629631, 6.531646345), (12.602154096, 7.628519198))
            Line((12.602154096, 7.628519198), (12.190826776, 8.269965873))
            Line((12.190826776, 8.269965873), (10.480302311, 7.17309302))
            ThreePointArc((10.480302311, 7.17309302), (9.992022883, 7.838971789), (9.461504789, 8.471713352))
            Line((9.461504789, 8.471713352), (10.93399995, 9.871992611))
            Line((10.93399995, 9.871992611), (10.408895228, 10.424178296))
            Line((10.408895228, 10.424178296), (8.936400068, 9.023899037))
            ThreePointArc((8.936400068, 9.023899037), (8.331113204, 9.585538732), (7.690608736, 10.106658066))
            Line((7.690608736, 10.106658066), (8.872040326, 11.759910436))
            Line((8.872040326, 11.759910436), (8.252070688, 12.202947282))
            Line((8.252070688, 12.202947282), (7.070639097, 10.549694913))
            ThreePointArc((7.070639097, 10.549694913), (6.370145171, 10.986867183), (5.642723121, 11.377595343))
            Line((5.642723121, 11.377595343), (6.490539995, 13.224276297))
            Line((6.490539995, 13.224276297), (5.798034637, 13.542207625))
            Line((5.798034637, 13.542207625), (4.950217763, 11.695526671))
            ThreePointArc((4.950217763, 11.695526671), (4.179746182, 11.992486058), (3.391605817, 12.238750344))
            Line((3.391605817, 12.238750344), (3.875272495, 14.212348719))
            Line((3.875272495, 14.212348719), (3.135173105, 14.393723723))
            Line((3.135173105, 14.393723723), (2.651506426, 12.420125348))
            ThreePointArc((2.651506426, 12.420125348), (1.838806956, 12.566176387), (1.01833441, 12.659107197))
            Line((1.01833441, 12.659107197), (1.120430865, 14.688540693))
            Line((1.120430865, 14.688540693), (0.359393304, 14.726826863))
            Line((0.359393304, 14.726826863), (0.25729685, 12.697393368))
            ThreePointArc((0.25729685, 12.697393368), (-0.56835984, 12.687275795), (-1.391613937, 12.623526078))
            Line((-1.391613937, 12.623526078), (-1.674764873, 14.635701406))
            Line((-1.674764873, 14.635701406), (-2.429330621, 14.529519804))
            Line((-2.429330621, 14.529519804), (-2.146179684, 12.517344477))
            ThreePointArc((-2.146179684, 12.517344477), (-2.955056249, 12.351422694), (-3.751441085, 12.133288498))
            Line((-3.751441085, 12.133288498), (-4.409641278, 14.055733948))
            Line((-4.409641278, 14.055733948), (-5.130558322, 13.808908875))
            Line((-5.130558322, 13.808908875), (-4.472358128, 11.886463426))
            ThreePointArc((-4.472358128, 11.886463426), (-5.235321585, 11.57071337), (-5.976154088, 11.206051147))
            Line((-5.976154088, 11.206051147), (-6.985697408, 12.969526774))
            Line((-6.985697408, 12.969526774), (-7.647000768, 12.590948029))
            Line((-7.647000768, 12.590948029), (-6.637457448, 10.827472402))
            ThreePointArc((-6.637457448, 10.827472402), (-7.32702845, 10.373266318), (-7.985626353, 9.87520996))
            Line((-7.985626353, 9.87520996), (-9.310152483, 11.416201371))
            Line((-9.310152483, 11.416201371), (-9.888024263, 10.919504073))
            Line((-9.888024263, 10.919504073), (-8.563498133, 9.378512661))
            ThreePointArc((-8.563498133, 9.378512661), (-9.154840678, 8.802209504), (-9.707483526, 8.188697307))
            Line((-9.707483526, 8.188697307), (-11.299287542, 9.451703236))
            Line((-11.299287542, 9.451703236), (-11.772914765, 8.85477673))
            Line((-11.772914765, 8.85477673), (-10.18111075, 7.591770801))
            ThreePointArc((-10.18111075, 7.591770801), (-10.652926692, 6.914127052), (-11.07971017, 6.207255637))
            Line((-11.07971017, 6.207255637), (-12.881460706, 7.146786907))
            Line((-12.881460706, 7.146786907), (-13.233784932, 6.471130456))
            Line((-13.233784932, 6.471130456), (-11.432034397, 5.531599186))
            ThreePointArc((-11.432034397, 5.531599186), (-11.767330531, 4.777021267), (-12.052883349, 4.002249738))
            Line((-12.052883349, 4.002249738), (-13.999687481, 4.584467629))
            Line((-13.999687481, 4.584467629), (-14.21801919, 3.85441608))
            Line((-14.21801919, 3.85441608), (-12.271215059, 3.272198189))
            ThreePointArc((-12.271215059, 3.272198189), (-12.457915159, 2.467863428), (-12.591952677, 1.65309642))
            Line((-12.591952677, 1.65309642), (-14.613693144, 1.857031424))
            Line((-14.613693144, 1.857031424), (-14.690168771, 1.098878749))
            Line((-14.690168771, 1.098878749), (-12.668428304, 0.894943745))
            ThreePointArc((-12.668428304, 0.894943745), (-12.699808068, 0.069821545), (-12.677502711, -0.755595807))
            Line((-12.677502711, -0.755595807), (-14.701363299, -0.937288734))
            Line((-14.701363299, -0.937288734), (-14.633228451, -1.696236455))
            Line((-14.633228451, -1.696236455), (-12.609367863, -1.514543528))
            ThreePointArc((-12.609367863, -1.514543528), (-12.484297098, -2.330735073), (-12.306452228, -3.137074044))
            Line((-12.306452228, -3.137074044), (-14.259540365, -3.697850941))
            Line((-14.259540365, -3.697850941), (-14.049249029, -4.430258993))
            Line((-14.049249029, -4.430258993), (-12.096160892, -3.869482095))
            ThreePointArc((-12.096160892, -3.869482095), (-11.819144221, -4.647346543), (-11.492165206, -5.405565547))
            Line((-11.492165206, -5.405565547), (-13.304137302, -6.325229139))
            Line((-13.304137302, -6.325229139), (-12.959263455, -7.004718675))
            Line((-12.959263455, -7.004718675), (-11.147291359, -6.085055083))
            ThreePointArc((-11.147291359, -6.085055083), (-10.728305981, -6.796576402), (-10.263969492, -7.479366969))
            Line((-10.263969492, -7.479366969), (-11.869564477, -8.724794102))
            Line((-11.869564477, -8.724794102), (-11.402529302, -9.326892222))
            Line((-11.402529302, -9.326892222), (-9.796934317, -8.081465089))
            ThreePointArc((-9.796934317, -8.081465089), (-9.251070659, -8.701016702), (-8.666100518, -9.283787041))
            Line((-8.666100518, -9.283787041), (-10.007490323, -10.810121666))
            Line((-10.007490323, -10.810121666), (-9.435114839, -11.313142843))
            Line((-9.435114839, -11.313142843), (-8.093725033, -9.786808218))
            ThreePointArc((-8.093725033, -9.786808218), (-7.440643248, -10.292075984), (-6.756108087, -10.753836688))
            Line((-6.756108087, -10.753836688), (-7.784980416, -12.506105427))
            Line((-7.784980416, -12.506105427), (-7.127879639, -12.89193255))
            Line((-7.127879639, -12.89193255), (-6.09900731, -11.139663811))
            ThreePointArc((-6.09900731, -11.139663811), (-5.362229181, -11.512449705), (-4.602783629, -11.836569725))
            Line((-4.602783629, -11.836569725), (-5.282082, -13.751661818))
            Line((-5.282082, -13.751661818), (-4.563922465, -14.006398707))
            Line((-4.563922465, -14.006398707), (-3.884624094, -12.091306615))
            ThreePointArc((-3.884624094, -12.091306615), (-3.090685862, -12.318184156), (-2.283682564, -12.492989792))
            Line((-2.283682564, -12.492989792), (-2.588940961, -14.501930137))
            Line((-2.588940961, -14.501930137), (-1.835588332, -14.616402036))
            Line((-1.835588332, -14.616402036), (-1.530329935, -12.607461691))
            ThreePointArc((-1.530329935, -12.607461691), (-0.707826555, -12.680259523), (0.117668977, -12.699454871))
            Line((0.117668977, -12.699454871), (0.197444923, -14.729888272))
            Line((0.197444923, -14.729888272), (0.958857448, -14.699972293))
            Line((0.958857448, -14.699972293), (0.879081503, -12.669538891))
            ThreePointArc((0.879081503, -12.669538891), (1.700526258, -12.585635083), (2.514782482, -12.448528791))
            Line((2.514782482, -12.448528791), (2.976719512, -14.427325946))
            Line((2.976719512, -14.427325946), (3.718768445, -14.25409956))
            Line((3.718768445, -14.25409956), (3.256831415, -12.275302405))
            ThreePointArc((3.256831415, -12.275302405), (4.0476319, -12.037718887), (4.821322078, -11.749249058))
            Line((4.821322078, -11.749249058), (5.648782792, -13.605140425))
            Line((5.648782792, -13.605140425), (6.344742055, -13.294842657))
            Line((6.344742055, -13.294842657), (5.51728134, -11.43895129))
            ThreePointArc((5.51728134, -11.43895129), (6.248955611, -11.056245012), (6.954214055, -10.626801347))
            Line((6.954214055, -10.626801347), (8.117396135, -12.292944033))
            Line((8.117396135, -12.292944033), (8.742199642, -11.856750754))
            Line((8.742199642, -11.856750754), (7.579017563, -10.190608067))
            ThreePointArc((7.579017563, -10.190608067), (8.225213203, -9.676562808), (8.836638903, -9.121612407))
            Line((8.836638903, -9.121612407), (10.293648486, -10.537997621))
            Line((10.293648486, -10.537997621), (10.824792941, -9.991619028))
            Line((10.824792941, -9.991619028), (9.367783358, -8.575233813))
            ThreePointArc((9.367783358, -8.575233813), (9.905226598, -7.948363733), (10.400798081, -7.287894022))
            Line((10.400798081, -7.287894022), (12.09915864, -8.403508388))
            Line((12.09915864, -8.403508388), (12.517514027, -7.766623178))
            Line((12.517514027, -7.766623178), (10.819153469, -6.651008812))
            ThreePointArc((10.819153469, -6.651008812), (11.228487432, -5.933891639), (11.590355899, -5.191690489))
            Line((11.590355899, -5.191690489), (13.468898264, -5.966353373))
            Line((13.468898264, -5.966353373), (13.759396845, -5.261899986))
            Line((13.759396845, -5.261899986), (11.880854481, -4.487237102))
            ThreePointArc((11.880854481, -4.487237102), (12.147336351, -3.705700956), (12.362468531, -2.908499928))
            Line((12.362468531, -2.908499928), (14.353533997, -3.314310608))
            Line((14.353533997, -3.314310608), (14.505713002, -2.567661059))
            Line((14.505713002, -2.567661059), (12.514647536, -2.161850378))
        make_face()
        Circle(INTERSECT1_OUTLINE_R, mode=Mode.SUBTRACT)
        with Locations((0, -8.255)):
            Circle(INTERSECT1_OUTLINE_R_2, mode=Mode.SUBTRACT)
        with Locations((0, 8.255)):
            Circle(INTERSECT1_OUTLINE_R_2, mode=Mode.SUBTRACT)
    extrude(amount=INTERSECT1_DEPTH, mode=Mode.SUBTRACT)

    # Intersect1 2 outline → Intersect1 2 (cut)
    with BuildSketch(Plane(origin=(0, 0, 0), x_dir=(1, 0, 0), z_dir=(0, 1, 0)).offset(INTERSECT1_START)):
        with BuildLine():
            ThreePointArc((12.514647536, -2.161850378), (12.635877916, -1.274593779), (12.694283714, -0.381))
            Line((12.694283714, -0.381), (14.726283714, -0.381))
            Line((14.726283714, -0.381), (14.726283714, 0.381))
            Line((14.726283714, 0.381), (12.694283714, 0.381))
            ThreePointArc((12.694283714, 0.381), (12.642694362, 1.205105499), (12.537661324, 2.024116729))
            Line((12.537661324, 2.024116729), (14.53306846, 2.408010411))
            Line((14.53306846, 2.408010411), (14.38910833, 3.156288087))
            Line((14.38910833, 3.156288087), (12.393701193, 2.772394405))
            ThreePointArc((12.393701193, 2.772394405), (12.187347525, 3.571912696), (11.929475029, 4.35633166))
            Line((11.929475029, 4.35633166), (13.816421526, 5.110292479))
            Line((13.816421526, 5.110292479), (13.533686219, 5.817897415))
            Line((13.533686219, 5.817897415), (11.646739722, 5.063936596))
            ThreePointArc((11.646739722, 5.063936596), (11.293053894, 5.810071751), (10.891629631, 6.531646345))
            Line((10.891629631, 6.531646345), (12.602154096, 7.628519198))
            Line((12.602154096, 7.628519198), (12.190826776, 8.269965873))
            Line((12.190826776, 8.269965873), (10.480302311, 7.17309302))
            ThreePointArc((10.480302311, 7.17309302), (9.992022883, 7.838971789), (9.461504789, 8.471713352))
            Line((9.461504789, 8.471713352), (10.93399995, 9.871992611))
            Line((10.93399995, 9.871992611), (10.408895228, 10.424178296))
            Line((10.408895228, 10.424178296), (8.936400068, 9.023899037))
            ThreePointArc((8.936400068, 9.023899037), (8.331113204, 9.585538732), (7.690608736, 10.106658066))
            Line((7.690608736, 10.106658066), (8.872040326, 11.759910436))
            Line((8.872040326, 11.759910436), (8.252070688, 12.202947282))
            Line((8.252070688, 12.202947282), (7.070639097, 10.549694913))
            ThreePointArc((7.070639097, 10.549694913), (6.370145171, 10.986867183), (5.642723121, 11.377595343))
            Line((5.642723121, 11.377595343), (6.490539995, 13.224276297))
            Line((6.490539995, 13.224276297), (5.798034637, 13.542207625))
            Line((5.798034637, 13.542207625), (4.950217763, 11.695526671))
            ThreePointArc((4.950217763, 11.695526671), (4.179746182, 11.992486058), (3.391605817, 12.238750344))
            Line((3.391605817, 12.238750344), (3.875272495, 14.212348719))
            Line((3.875272495, 14.212348719), (3.135173105, 14.393723723))
            Line((3.135173105, 14.393723723), (2.651506426, 12.420125348))
            ThreePointArc((2.651506426, 12.420125348), (1.838806956, 12.566176387), (1.01833441, 12.659107197))
            Line((1.01833441, 12.659107197), (1.120430865, 14.688540693))
            Line((1.120430865, 14.688540693), (0.359393304, 14.726826863))
            Line((0.359393304, 14.726826863), (0.25729685, 12.697393368))
            ThreePointArc((0.25729685, 12.697393368), (-0.56835984, 12.687275795), (-1.391613937, 12.623526078))
            Line((-1.391613937, 12.623526078), (-1.674764873, 14.635701406))
            Line((-1.674764873, 14.635701406), (-2.429330621, 14.529519804))
            Line((-2.429330621, 14.529519804), (-2.146179684, 12.517344477))
            ThreePointArc((-2.146179684, 12.517344477), (-2.955056249, 12.351422694), (-3.751441085, 12.133288498))
            Line((-3.751441085, 12.133288498), (-4.409641278, 14.055733948))
            Line((-4.409641278, 14.055733948), (-5.130558322, 13.808908875))
            Line((-5.130558322, 13.808908875), (-4.472358128, 11.886463426))
            ThreePointArc((-4.472358128, 11.886463426), (-5.235321585, 11.57071337), (-5.976154088, 11.206051147))
            Line((-5.976154088, 11.206051147), (-6.985697408, 12.969526774))
            Line((-6.985697408, 12.969526774), (-7.647000768, 12.590948029))
            Line((-7.647000768, 12.590948029), (-6.637457448, 10.827472402))
            ThreePointArc((-6.637457448, 10.827472402), (-7.32702845, 10.373266318), (-7.985626353, 9.87520996))
            Line((-7.985626353, 9.87520996), (-9.310152483, 11.416201371))
            Line((-9.310152483, 11.416201371), (-9.888024263, 10.919504073))
            Line((-9.888024263, 10.919504073), (-8.563498133, 9.378512661))
            ThreePointArc((-8.563498133, 9.378512661), (-9.154840678, 8.802209504), (-9.707483526, 8.188697307))
            Line((-9.707483526, 8.188697307), (-11.299287542, 9.451703236))
            Line((-11.299287542, 9.451703236), (-11.772914765, 8.85477673))
            Line((-11.772914765, 8.85477673), (-10.18111075, 7.591770801))
            ThreePointArc((-10.18111075, 7.591770801), (-10.652926692, 6.914127052), (-11.07971017, 6.207255637))
            Line((-11.07971017, 6.207255637), (-12.881460706, 7.146786907))
            Line((-12.881460706, 7.146786907), (-13.233784932, 6.471130456))
            Line((-13.233784932, 6.471130456), (-11.432034397, 5.531599186))
            ThreePointArc((-11.432034397, 5.531599186), (-11.767330531, 4.777021267), (-12.052883349, 4.002249738))
            Line((-12.052883349, 4.002249738), (-13.999687481, 4.584467629))
            Line((-13.999687481, 4.584467629), (-14.21801919, 3.85441608))
            Line((-14.21801919, 3.85441608), (-12.271215059, 3.272198189))
            ThreePointArc((-12.271215059, 3.272198189), (-12.457915159, 2.467863428), (-12.591952677, 1.65309642))
            Line((-12.591952677, 1.65309642), (-14.613693144, 1.857031424))
            Line((-14.613693144, 1.857031424), (-14.690168771, 1.098878749))
            Line((-14.690168771, 1.098878749), (-12.668428304, 0.894943745))
            ThreePointArc((-12.668428304, 0.894943745), (-12.699808068, 0.069821545), (-12.677502711, -0.755595807))
            Line((-12.677502711, -0.755595807), (-14.701363299, -0.937288734))
            Line((-14.701363299, -0.937288734), (-14.633228451, -1.696236455))
            Line((-14.633228451, -1.696236455), (-12.609367863, -1.514543528))
            ThreePointArc((-12.609367863, -1.514543528), (-12.484297098, -2.330735073), (-12.306452228, -3.137074044))
            Line((-12.306452228, -3.137074044), (-14.259540365, -3.697850941))
            Line((-14.259540365, -3.697850941), (-14.049249029, -4.430258993))
            Line((-14.049249029, -4.430258993), (-12.096160892, -3.869482095))
            ThreePointArc((-12.096160892, -3.869482095), (-11.819144221, -4.647346543), (-11.492165206, -5.405565547))
            Line((-11.492165206, -5.405565547), (-13.304137302, -6.325229139))
            Line((-13.304137302, -6.325229139), (-12.959263455, -7.004718675))
            Line((-12.959263455, -7.004718675), (-11.147291359, -6.085055083))
            ThreePointArc((-11.147291359, -6.085055083), (-10.728305981, -6.796576402), (-10.263969492, -7.479366969))
            Line((-10.263969492, -7.479366969), (-11.869564477, -8.724794102))
            Line((-11.869564477, -8.724794102), (-11.402529302, -9.326892222))
            Line((-11.402529302, -9.326892222), (-9.796934317, -8.081465089))
            ThreePointArc((-9.796934317, -8.081465089), (-9.251070659, -8.701016702), (-8.666100518, -9.283787041))
            Line((-8.666100518, -9.283787041), (-10.007490323, -10.810121666))
            Line((-10.007490323, -10.810121666), (-9.435114839, -11.313142843))
            Line((-9.435114839, -11.313142843), (-8.093725033, -9.786808218))
            ThreePointArc((-8.093725033, -9.786808218), (-7.440643248, -10.292075984), (-6.756108087, -10.753836688))
            Line((-6.756108087, -10.753836688), (-7.784980416, -12.506105427))
            Line((-7.784980416, -12.506105427), (-7.127879639, -12.89193255))
            Line((-7.127879639, -12.89193255), (-6.09900731, -11.139663811))
            ThreePointArc((-6.09900731, -11.139663811), (-5.362229181, -11.512449705), (-4.602783629, -11.836569725))
            Line((-4.602783629, -11.836569725), (-5.282082, -13.751661818))
            Line((-5.282082, -13.751661818), (-4.563922465, -14.006398707))
            Line((-4.563922465, -14.006398707), (-3.884624094, -12.091306615))
            ThreePointArc((-3.884624094, -12.091306615), (-3.090685862, -12.318184156), (-2.283682564, -12.492989792))
            Line((-2.283682564, -12.492989792), (-2.588940961, -14.501930137))
            Line((-2.588940961, -14.501930137), (-1.835588332, -14.616402036))
            Line((-1.835588332, -14.616402036), (-1.530329935, -12.607461691))
            ThreePointArc((-1.530329935, -12.607461691), (-0.707826555, -12.680259523), (0.117668977, -12.699454871))
            Line((0.117668977, -12.699454871), (0.197444923, -14.729888272))
            Line((0.197444923, -14.729888272), (0.958857448, -14.699972293))
            Line((0.958857448, -14.699972293), (0.879081503, -12.669538891))
            ThreePointArc((0.879081503, -12.669538891), (1.700526258, -12.585635083), (2.514782482, -12.448528791))
            Line((2.514782482, -12.448528791), (2.976719512, -14.427325946))
            Line((2.976719512, -14.427325946), (3.718768445, -14.25409956))
            Line((3.718768445, -14.25409956), (3.256831415, -12.275302405))
            ThreePointArc((3.256831415, -12.275302405), (4.0476319, -12.037718887), (4.821322078, -11.749249058))
            Line((4.821322078, -11.749249058), (5.648782792, -13.605140425))
            Line((5.648782792, -13.605140425), (6.344742055, -13.294842657))
            Line((6.344742055, -13.294842657), (5.51728134, -11.43895129))
            ThreePointArc((5.51728134, -11.43895129), (6.248955611, -11.056245012), (6.954214055, -10.626801347))
            Line((6.954214055, -10.626801347), (8.117396135, -12.292944033))
            Line((8.117396135, -12.292944033), (8.742199642, -11.856750754))
            Line((8.742199642, -11.856750754), (7.579017563, -10.190608067))
            ThreePointArc((7.579017563, -10.190608067), (8.225213203, -9.676562808), (8.836638903, -9.121612407))
            Line((8.836638903, -9.121612407), (10.293648486, -10.537997621))
            Line((10.293648486, -10.537997621), (10.824792941, -9.991619028))
            Line((10.824792941, -9.991619028), (9.367783358, -8.575233813))
            ThreePointArc((9.367783358, -8.575233813), (9.905226598, -7.948363733), (10.400798081, -7.287894022))
            Line((10.400798081, -7.287894022), (12.09915864, -8.403508388))
            Line((12.09915864, -8.403508388), (12.517514027, -7.766623178))
            Line((12.517514027, -7.766623178), (10.819153469, -6.651008812))
            ThreePointArc((10.819153469, -6.651008812), (11.228487432, -5.933891639), (11.590355899, -5.191690489))
            Line((11.590355899, -5.191690489), (13.468898264, -5.966353373))
            Line((13.468898264, -5.966353373), (13.759396845, -5.261899986))
            Line((13.759396845, -5.261899986), (11.880854481, -4.487237102))
            ThreePointArc((11.880854481, -4.487237102), (12.147336351, -3.705700956), (12.362468531, -2.908499928))
            Line((12.362468531, -2.908499928), (14.353533997, -3.314310608))
            Line((14.353533997, -3.314310608), (14.505713002, -2.567661059))
            Line((14.505713002, -2.567661059), (12.514647536, -2.161850378))
        make_face()
        with Locations((0, -8.255)):
            Circle(INTERSECT1_2_OUTLINE_R, mode=Mode.SUBTRACT)
        Circle(INTERSECT1_2_OUTLINE_R_2, mode=Mode.SUBTRACT)
        with Locations((0, 8.255)):
            Circle(INTERSECT1_2_OUTLINE_R, mode=Mode.SUBTRACT)
    extrude(amount=INTERSECT1_2_DEPTH, mode=Mode.SUBTRACT)


solid = part.part
